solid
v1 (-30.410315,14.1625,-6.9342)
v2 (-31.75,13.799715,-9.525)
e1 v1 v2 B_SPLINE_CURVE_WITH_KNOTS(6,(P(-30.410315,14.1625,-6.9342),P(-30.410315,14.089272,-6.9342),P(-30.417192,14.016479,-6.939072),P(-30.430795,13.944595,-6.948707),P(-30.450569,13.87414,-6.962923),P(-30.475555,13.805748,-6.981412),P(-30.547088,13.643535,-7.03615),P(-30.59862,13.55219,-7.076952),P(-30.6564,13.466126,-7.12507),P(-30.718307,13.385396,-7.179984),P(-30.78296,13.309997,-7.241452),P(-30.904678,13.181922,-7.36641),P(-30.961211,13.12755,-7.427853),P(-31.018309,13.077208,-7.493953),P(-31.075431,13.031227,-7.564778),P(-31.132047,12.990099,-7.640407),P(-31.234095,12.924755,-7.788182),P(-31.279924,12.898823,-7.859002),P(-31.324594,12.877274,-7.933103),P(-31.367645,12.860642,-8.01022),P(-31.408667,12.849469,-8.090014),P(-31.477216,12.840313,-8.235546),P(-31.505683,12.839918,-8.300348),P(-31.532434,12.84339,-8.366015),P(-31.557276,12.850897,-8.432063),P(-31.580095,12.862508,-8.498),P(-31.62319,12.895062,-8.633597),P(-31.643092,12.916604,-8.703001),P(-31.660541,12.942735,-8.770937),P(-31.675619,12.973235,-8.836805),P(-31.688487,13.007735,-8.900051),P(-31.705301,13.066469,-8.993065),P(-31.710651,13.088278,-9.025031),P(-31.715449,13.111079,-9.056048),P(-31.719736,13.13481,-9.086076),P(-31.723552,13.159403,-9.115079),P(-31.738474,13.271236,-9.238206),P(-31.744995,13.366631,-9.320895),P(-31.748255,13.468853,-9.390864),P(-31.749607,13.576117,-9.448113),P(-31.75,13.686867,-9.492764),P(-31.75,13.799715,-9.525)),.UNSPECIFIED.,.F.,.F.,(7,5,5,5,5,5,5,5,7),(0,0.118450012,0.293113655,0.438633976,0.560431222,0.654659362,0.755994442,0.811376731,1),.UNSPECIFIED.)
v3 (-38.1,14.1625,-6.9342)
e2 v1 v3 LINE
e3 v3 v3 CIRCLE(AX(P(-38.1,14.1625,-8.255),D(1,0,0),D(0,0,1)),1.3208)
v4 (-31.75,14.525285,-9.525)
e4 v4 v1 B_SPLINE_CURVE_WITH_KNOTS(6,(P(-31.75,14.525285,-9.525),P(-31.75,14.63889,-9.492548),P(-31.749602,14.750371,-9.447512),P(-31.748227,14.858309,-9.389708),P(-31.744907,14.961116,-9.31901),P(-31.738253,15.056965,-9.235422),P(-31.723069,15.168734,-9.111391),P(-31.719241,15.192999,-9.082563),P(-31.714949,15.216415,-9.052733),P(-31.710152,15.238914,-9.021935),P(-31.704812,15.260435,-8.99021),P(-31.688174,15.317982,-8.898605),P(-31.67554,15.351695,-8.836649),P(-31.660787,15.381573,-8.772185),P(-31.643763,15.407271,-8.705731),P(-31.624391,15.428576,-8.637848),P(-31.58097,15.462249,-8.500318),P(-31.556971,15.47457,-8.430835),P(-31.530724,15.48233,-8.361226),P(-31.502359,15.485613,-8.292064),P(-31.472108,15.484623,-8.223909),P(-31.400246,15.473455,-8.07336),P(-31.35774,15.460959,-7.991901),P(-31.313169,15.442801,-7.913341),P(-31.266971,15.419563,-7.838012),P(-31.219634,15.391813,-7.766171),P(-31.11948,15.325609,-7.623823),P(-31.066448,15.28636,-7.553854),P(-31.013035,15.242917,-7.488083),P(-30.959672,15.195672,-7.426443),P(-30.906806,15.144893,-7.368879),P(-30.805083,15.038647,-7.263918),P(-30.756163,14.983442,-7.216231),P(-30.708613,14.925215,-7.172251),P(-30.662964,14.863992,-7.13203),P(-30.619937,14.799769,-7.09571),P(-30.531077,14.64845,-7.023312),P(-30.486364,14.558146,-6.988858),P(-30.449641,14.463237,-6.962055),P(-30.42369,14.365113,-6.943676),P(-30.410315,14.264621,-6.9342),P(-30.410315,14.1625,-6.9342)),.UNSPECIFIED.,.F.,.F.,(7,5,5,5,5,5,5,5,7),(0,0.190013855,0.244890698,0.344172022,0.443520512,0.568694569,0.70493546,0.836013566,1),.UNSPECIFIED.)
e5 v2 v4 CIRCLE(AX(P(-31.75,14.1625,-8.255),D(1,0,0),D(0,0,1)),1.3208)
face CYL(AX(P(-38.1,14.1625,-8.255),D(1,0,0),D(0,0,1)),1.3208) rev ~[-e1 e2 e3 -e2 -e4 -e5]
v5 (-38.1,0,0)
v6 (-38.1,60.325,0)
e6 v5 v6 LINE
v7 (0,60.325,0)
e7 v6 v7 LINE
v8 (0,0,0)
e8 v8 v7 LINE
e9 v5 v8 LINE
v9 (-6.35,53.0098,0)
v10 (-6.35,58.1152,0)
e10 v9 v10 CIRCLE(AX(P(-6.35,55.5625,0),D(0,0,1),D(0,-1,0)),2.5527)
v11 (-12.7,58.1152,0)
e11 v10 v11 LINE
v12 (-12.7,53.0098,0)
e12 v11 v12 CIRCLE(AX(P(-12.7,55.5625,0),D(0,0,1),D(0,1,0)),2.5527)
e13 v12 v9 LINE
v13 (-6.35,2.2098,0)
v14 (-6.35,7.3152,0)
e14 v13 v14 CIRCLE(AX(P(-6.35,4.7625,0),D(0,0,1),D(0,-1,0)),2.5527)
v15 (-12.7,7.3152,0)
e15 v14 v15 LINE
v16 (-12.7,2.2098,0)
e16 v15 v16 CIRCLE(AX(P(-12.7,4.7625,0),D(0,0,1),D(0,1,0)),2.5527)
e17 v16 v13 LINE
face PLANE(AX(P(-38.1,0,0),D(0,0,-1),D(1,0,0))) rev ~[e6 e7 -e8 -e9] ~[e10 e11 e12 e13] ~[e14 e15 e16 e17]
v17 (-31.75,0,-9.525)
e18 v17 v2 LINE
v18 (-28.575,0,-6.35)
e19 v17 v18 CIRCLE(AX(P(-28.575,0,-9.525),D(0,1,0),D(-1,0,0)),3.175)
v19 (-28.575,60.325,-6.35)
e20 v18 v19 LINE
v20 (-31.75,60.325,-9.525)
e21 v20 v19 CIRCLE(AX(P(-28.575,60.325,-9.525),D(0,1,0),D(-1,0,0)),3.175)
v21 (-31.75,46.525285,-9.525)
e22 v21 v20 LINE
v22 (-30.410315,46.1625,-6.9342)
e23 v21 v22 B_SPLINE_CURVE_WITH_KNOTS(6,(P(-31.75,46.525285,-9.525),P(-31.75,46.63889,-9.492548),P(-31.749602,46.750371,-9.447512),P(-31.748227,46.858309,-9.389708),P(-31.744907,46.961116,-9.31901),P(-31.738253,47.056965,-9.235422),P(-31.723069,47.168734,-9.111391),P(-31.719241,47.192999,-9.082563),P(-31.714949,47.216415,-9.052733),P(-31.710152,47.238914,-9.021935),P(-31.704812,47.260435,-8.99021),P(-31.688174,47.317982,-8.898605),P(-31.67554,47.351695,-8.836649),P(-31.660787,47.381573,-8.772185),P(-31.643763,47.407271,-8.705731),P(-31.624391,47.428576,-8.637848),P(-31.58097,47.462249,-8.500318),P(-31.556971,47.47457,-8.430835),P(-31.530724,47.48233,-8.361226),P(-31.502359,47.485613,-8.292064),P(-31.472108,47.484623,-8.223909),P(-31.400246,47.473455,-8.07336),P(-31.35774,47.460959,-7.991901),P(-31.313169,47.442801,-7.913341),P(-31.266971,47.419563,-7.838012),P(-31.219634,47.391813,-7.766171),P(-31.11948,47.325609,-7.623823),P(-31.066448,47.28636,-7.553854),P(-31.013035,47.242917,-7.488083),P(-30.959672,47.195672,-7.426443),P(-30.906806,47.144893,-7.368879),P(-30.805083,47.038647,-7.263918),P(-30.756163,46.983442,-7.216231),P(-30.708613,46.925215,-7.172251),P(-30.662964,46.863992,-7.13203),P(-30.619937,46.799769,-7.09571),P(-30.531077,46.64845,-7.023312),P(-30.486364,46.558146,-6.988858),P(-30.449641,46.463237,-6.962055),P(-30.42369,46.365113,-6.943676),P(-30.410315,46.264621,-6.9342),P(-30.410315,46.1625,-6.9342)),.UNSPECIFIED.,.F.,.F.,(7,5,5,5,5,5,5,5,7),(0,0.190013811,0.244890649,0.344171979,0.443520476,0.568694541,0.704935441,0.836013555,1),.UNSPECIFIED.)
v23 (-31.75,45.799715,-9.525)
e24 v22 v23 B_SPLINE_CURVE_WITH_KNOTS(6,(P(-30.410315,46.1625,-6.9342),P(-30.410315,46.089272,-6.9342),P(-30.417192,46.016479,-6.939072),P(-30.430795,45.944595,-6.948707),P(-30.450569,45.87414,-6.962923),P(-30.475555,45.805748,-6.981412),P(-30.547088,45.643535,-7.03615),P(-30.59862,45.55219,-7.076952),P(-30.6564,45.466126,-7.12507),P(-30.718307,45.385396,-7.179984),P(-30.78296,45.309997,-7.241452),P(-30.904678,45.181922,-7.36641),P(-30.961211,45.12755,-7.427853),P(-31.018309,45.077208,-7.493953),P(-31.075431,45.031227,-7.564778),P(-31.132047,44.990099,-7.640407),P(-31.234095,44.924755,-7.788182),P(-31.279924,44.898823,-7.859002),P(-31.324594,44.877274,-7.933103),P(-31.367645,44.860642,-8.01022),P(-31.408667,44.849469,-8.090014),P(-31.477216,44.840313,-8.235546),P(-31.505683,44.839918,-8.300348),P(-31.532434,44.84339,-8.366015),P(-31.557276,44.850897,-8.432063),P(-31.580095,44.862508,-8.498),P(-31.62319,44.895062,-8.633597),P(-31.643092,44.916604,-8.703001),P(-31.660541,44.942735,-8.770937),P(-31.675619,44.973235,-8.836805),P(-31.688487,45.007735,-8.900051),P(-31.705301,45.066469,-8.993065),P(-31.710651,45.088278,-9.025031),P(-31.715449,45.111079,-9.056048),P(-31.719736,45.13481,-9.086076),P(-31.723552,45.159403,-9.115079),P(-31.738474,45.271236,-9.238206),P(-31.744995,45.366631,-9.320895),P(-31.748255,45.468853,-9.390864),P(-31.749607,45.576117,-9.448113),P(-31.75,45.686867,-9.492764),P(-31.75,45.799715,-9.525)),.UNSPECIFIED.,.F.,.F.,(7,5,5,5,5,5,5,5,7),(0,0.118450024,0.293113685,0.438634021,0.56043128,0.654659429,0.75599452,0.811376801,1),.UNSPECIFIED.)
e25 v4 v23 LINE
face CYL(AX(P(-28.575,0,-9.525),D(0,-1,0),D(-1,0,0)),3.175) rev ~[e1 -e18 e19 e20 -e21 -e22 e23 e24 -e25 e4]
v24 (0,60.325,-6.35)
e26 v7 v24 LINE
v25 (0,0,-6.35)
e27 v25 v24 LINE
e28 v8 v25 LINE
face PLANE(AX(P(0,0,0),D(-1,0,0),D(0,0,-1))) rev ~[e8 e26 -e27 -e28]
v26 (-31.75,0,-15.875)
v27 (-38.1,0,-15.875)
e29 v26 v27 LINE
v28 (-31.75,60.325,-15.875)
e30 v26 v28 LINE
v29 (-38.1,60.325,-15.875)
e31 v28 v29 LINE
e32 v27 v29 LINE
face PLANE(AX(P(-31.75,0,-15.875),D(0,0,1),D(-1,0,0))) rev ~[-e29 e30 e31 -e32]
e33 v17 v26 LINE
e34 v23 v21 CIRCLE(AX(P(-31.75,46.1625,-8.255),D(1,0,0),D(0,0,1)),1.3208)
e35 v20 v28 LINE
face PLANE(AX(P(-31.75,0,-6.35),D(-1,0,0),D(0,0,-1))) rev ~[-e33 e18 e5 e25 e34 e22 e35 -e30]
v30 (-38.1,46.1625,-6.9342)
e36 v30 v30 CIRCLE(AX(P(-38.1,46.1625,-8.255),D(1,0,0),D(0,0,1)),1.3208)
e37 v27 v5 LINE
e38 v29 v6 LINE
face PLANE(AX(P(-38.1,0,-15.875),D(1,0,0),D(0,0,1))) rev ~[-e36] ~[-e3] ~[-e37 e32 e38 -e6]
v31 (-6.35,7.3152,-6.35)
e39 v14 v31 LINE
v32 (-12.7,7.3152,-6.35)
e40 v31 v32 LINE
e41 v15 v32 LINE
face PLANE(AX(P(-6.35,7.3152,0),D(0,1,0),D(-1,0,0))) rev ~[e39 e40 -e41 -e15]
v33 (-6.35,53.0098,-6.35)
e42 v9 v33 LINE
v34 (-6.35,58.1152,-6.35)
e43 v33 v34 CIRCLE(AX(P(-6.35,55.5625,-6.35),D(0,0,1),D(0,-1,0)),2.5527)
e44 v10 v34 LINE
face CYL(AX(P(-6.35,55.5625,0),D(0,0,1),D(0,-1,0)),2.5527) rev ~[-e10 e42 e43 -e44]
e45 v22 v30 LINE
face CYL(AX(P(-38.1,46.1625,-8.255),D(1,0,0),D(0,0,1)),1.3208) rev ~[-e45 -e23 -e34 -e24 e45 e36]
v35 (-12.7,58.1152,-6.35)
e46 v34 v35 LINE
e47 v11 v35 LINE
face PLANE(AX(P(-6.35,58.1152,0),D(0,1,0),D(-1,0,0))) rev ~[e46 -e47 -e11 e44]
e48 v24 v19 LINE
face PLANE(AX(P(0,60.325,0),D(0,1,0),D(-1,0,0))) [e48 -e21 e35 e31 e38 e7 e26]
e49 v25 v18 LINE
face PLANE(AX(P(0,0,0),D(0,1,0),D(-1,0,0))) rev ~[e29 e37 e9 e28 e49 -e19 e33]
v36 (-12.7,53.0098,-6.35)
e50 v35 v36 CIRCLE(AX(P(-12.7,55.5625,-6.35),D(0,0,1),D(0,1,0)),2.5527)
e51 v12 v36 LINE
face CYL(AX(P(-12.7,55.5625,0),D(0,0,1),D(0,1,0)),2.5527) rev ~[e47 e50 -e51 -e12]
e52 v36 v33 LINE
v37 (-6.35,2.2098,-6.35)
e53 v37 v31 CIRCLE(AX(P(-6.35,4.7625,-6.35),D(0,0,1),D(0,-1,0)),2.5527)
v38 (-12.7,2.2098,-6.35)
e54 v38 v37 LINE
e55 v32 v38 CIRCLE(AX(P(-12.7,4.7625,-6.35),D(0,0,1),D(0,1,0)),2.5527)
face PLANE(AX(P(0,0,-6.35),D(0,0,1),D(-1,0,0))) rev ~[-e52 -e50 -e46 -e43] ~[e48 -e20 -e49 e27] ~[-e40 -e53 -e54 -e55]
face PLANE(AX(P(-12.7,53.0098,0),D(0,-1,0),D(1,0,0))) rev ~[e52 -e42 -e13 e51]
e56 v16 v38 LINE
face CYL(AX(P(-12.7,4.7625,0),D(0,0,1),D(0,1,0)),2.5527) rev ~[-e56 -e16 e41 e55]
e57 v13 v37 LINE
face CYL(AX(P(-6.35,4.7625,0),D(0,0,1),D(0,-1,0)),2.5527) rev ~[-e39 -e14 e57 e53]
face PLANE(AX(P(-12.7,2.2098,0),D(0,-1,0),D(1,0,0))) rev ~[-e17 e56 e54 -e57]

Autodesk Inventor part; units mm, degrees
ref_plane "YZ Plane" through (0, 0, 0) normal (1, 0, 0) x (0, 1, 0)
ref_plane "XZ Plane" through (0, 0, 0) normal (0, 1, 0) x (-1, 0, 0)
ref_plane "XY Plane" through (0, 0, 0) normal (0, 0, 1) x (1, 0, 0)
sketch "Sketch1" plane through (0, 0, 0) normal (0, 1, 0) x (-1, 0, 0)
  line L0 (0, 0) -> (0, -6.35)
  line L1 (0, -6.35) -> (31.75, -6.35)
  line L2 (31.75, -6.35) -> (31.75, -15.875)
  line L3 (31.75, -15.875) -> (38.1, -15.875)
  line L4 (38.1, -15.875) -> (38.1, 0)
  line L5 (38.1, 0) -> (0, 0)
  dimension "d0" = 6.35
  dimension "d1" = 38.1
  dimension "d2" = 15.875
extrude "Extrusion1" add sketch "Sketch1" along normal blind 60.325
sketch "Sketch2" plane through (-38.1, 0, 0) normal (0, 0, 1) x (1, 0, 0)
  line L0 (31.75, 4.7625) -> (31.75, 55.5625) construction
  line L1 (38.1, 0) -> (38.1, 60.325) construction
  line L2 (25.4, 4.7625) -> (31.75, 4.7625) construction
  line L3 (25.4, 2.2098) -> (31.75, 2.2098)
  line L4 (31.75, 7.3152) -> (25.4, 7.3152)
  arc A0 (25.4, 7.3152) -> (25.4, 2.2098) centre (25.4, 4.7625) ccw
  arc A1 (31.75, 2.2098) -> (31.75, 7.3152) centre (31.75, 4.7625) ccw
  line L5 (25.4, 55.5625) -> (31.75, 55.5625) construction
  line L6 (25.4, 53.0098) -> (31.75, 53.0098)
  line L7 (31.75, 58.1152) -> (25.4, 58.1152)
  arc A2 (25.4, 58.1152) -> (25.4, 53.0098) centre (25.4, 55.5625) ccw
  arc A3 (31.75, 53.0098) -> (31.75, 58.1152) centre (31.75, 55.5625) ccw
  point P0 (31.75, 30.1625)
  point P1 (38.1, 30.1625)
  point P2 (28.575, 4.7625)
  point P3 (28.575, 55.5625)
  dimension "d5" = 50.8
  dimension "d6" = 6.35
  dimension "d24" = 5.1054
  dimension "d25" = 6.35
sketch "Sketch3" plane through (-38.1, 0, -15.875) normal (-1, 0, 0) x (0, 0, 1)
  line L0 (7.62, 46.1625) -> (7.62, 14.1625) construction
  line L1 (0, 0) -> (0, 60.325) construction
  line L2 (0, 60.325) -> (15.875, 60.325) construction
  line L3 (15.875, 0) -> (15.875, 60.325) construction
  point P0 (7.62, 30.1625)
  point P1 (0, 30.1625)
  point P2 (7.9375, 60.325)
  dimension "d14" = 32
  dimension "d23" = 8.255
hole "Hole2" at (-38.1, 46.1625, -8.255) at (-38.1, 14.1625, -8.255) direction (1, 0, 0) diameter 2.6416 depth 19.05 tip angle 118 thread size "6-32 UNC" class "2B" standard "ANSI Unified Screw Threads"
extrude "Extrusion2" cut sketch "Sketch2" against normal blind 25.4
fillet "Fillet2" radius 3.175 1 edges at (-31.75, 30.1625, -6.35)
properties part number "HS-001" material "Aluminum 6061"
